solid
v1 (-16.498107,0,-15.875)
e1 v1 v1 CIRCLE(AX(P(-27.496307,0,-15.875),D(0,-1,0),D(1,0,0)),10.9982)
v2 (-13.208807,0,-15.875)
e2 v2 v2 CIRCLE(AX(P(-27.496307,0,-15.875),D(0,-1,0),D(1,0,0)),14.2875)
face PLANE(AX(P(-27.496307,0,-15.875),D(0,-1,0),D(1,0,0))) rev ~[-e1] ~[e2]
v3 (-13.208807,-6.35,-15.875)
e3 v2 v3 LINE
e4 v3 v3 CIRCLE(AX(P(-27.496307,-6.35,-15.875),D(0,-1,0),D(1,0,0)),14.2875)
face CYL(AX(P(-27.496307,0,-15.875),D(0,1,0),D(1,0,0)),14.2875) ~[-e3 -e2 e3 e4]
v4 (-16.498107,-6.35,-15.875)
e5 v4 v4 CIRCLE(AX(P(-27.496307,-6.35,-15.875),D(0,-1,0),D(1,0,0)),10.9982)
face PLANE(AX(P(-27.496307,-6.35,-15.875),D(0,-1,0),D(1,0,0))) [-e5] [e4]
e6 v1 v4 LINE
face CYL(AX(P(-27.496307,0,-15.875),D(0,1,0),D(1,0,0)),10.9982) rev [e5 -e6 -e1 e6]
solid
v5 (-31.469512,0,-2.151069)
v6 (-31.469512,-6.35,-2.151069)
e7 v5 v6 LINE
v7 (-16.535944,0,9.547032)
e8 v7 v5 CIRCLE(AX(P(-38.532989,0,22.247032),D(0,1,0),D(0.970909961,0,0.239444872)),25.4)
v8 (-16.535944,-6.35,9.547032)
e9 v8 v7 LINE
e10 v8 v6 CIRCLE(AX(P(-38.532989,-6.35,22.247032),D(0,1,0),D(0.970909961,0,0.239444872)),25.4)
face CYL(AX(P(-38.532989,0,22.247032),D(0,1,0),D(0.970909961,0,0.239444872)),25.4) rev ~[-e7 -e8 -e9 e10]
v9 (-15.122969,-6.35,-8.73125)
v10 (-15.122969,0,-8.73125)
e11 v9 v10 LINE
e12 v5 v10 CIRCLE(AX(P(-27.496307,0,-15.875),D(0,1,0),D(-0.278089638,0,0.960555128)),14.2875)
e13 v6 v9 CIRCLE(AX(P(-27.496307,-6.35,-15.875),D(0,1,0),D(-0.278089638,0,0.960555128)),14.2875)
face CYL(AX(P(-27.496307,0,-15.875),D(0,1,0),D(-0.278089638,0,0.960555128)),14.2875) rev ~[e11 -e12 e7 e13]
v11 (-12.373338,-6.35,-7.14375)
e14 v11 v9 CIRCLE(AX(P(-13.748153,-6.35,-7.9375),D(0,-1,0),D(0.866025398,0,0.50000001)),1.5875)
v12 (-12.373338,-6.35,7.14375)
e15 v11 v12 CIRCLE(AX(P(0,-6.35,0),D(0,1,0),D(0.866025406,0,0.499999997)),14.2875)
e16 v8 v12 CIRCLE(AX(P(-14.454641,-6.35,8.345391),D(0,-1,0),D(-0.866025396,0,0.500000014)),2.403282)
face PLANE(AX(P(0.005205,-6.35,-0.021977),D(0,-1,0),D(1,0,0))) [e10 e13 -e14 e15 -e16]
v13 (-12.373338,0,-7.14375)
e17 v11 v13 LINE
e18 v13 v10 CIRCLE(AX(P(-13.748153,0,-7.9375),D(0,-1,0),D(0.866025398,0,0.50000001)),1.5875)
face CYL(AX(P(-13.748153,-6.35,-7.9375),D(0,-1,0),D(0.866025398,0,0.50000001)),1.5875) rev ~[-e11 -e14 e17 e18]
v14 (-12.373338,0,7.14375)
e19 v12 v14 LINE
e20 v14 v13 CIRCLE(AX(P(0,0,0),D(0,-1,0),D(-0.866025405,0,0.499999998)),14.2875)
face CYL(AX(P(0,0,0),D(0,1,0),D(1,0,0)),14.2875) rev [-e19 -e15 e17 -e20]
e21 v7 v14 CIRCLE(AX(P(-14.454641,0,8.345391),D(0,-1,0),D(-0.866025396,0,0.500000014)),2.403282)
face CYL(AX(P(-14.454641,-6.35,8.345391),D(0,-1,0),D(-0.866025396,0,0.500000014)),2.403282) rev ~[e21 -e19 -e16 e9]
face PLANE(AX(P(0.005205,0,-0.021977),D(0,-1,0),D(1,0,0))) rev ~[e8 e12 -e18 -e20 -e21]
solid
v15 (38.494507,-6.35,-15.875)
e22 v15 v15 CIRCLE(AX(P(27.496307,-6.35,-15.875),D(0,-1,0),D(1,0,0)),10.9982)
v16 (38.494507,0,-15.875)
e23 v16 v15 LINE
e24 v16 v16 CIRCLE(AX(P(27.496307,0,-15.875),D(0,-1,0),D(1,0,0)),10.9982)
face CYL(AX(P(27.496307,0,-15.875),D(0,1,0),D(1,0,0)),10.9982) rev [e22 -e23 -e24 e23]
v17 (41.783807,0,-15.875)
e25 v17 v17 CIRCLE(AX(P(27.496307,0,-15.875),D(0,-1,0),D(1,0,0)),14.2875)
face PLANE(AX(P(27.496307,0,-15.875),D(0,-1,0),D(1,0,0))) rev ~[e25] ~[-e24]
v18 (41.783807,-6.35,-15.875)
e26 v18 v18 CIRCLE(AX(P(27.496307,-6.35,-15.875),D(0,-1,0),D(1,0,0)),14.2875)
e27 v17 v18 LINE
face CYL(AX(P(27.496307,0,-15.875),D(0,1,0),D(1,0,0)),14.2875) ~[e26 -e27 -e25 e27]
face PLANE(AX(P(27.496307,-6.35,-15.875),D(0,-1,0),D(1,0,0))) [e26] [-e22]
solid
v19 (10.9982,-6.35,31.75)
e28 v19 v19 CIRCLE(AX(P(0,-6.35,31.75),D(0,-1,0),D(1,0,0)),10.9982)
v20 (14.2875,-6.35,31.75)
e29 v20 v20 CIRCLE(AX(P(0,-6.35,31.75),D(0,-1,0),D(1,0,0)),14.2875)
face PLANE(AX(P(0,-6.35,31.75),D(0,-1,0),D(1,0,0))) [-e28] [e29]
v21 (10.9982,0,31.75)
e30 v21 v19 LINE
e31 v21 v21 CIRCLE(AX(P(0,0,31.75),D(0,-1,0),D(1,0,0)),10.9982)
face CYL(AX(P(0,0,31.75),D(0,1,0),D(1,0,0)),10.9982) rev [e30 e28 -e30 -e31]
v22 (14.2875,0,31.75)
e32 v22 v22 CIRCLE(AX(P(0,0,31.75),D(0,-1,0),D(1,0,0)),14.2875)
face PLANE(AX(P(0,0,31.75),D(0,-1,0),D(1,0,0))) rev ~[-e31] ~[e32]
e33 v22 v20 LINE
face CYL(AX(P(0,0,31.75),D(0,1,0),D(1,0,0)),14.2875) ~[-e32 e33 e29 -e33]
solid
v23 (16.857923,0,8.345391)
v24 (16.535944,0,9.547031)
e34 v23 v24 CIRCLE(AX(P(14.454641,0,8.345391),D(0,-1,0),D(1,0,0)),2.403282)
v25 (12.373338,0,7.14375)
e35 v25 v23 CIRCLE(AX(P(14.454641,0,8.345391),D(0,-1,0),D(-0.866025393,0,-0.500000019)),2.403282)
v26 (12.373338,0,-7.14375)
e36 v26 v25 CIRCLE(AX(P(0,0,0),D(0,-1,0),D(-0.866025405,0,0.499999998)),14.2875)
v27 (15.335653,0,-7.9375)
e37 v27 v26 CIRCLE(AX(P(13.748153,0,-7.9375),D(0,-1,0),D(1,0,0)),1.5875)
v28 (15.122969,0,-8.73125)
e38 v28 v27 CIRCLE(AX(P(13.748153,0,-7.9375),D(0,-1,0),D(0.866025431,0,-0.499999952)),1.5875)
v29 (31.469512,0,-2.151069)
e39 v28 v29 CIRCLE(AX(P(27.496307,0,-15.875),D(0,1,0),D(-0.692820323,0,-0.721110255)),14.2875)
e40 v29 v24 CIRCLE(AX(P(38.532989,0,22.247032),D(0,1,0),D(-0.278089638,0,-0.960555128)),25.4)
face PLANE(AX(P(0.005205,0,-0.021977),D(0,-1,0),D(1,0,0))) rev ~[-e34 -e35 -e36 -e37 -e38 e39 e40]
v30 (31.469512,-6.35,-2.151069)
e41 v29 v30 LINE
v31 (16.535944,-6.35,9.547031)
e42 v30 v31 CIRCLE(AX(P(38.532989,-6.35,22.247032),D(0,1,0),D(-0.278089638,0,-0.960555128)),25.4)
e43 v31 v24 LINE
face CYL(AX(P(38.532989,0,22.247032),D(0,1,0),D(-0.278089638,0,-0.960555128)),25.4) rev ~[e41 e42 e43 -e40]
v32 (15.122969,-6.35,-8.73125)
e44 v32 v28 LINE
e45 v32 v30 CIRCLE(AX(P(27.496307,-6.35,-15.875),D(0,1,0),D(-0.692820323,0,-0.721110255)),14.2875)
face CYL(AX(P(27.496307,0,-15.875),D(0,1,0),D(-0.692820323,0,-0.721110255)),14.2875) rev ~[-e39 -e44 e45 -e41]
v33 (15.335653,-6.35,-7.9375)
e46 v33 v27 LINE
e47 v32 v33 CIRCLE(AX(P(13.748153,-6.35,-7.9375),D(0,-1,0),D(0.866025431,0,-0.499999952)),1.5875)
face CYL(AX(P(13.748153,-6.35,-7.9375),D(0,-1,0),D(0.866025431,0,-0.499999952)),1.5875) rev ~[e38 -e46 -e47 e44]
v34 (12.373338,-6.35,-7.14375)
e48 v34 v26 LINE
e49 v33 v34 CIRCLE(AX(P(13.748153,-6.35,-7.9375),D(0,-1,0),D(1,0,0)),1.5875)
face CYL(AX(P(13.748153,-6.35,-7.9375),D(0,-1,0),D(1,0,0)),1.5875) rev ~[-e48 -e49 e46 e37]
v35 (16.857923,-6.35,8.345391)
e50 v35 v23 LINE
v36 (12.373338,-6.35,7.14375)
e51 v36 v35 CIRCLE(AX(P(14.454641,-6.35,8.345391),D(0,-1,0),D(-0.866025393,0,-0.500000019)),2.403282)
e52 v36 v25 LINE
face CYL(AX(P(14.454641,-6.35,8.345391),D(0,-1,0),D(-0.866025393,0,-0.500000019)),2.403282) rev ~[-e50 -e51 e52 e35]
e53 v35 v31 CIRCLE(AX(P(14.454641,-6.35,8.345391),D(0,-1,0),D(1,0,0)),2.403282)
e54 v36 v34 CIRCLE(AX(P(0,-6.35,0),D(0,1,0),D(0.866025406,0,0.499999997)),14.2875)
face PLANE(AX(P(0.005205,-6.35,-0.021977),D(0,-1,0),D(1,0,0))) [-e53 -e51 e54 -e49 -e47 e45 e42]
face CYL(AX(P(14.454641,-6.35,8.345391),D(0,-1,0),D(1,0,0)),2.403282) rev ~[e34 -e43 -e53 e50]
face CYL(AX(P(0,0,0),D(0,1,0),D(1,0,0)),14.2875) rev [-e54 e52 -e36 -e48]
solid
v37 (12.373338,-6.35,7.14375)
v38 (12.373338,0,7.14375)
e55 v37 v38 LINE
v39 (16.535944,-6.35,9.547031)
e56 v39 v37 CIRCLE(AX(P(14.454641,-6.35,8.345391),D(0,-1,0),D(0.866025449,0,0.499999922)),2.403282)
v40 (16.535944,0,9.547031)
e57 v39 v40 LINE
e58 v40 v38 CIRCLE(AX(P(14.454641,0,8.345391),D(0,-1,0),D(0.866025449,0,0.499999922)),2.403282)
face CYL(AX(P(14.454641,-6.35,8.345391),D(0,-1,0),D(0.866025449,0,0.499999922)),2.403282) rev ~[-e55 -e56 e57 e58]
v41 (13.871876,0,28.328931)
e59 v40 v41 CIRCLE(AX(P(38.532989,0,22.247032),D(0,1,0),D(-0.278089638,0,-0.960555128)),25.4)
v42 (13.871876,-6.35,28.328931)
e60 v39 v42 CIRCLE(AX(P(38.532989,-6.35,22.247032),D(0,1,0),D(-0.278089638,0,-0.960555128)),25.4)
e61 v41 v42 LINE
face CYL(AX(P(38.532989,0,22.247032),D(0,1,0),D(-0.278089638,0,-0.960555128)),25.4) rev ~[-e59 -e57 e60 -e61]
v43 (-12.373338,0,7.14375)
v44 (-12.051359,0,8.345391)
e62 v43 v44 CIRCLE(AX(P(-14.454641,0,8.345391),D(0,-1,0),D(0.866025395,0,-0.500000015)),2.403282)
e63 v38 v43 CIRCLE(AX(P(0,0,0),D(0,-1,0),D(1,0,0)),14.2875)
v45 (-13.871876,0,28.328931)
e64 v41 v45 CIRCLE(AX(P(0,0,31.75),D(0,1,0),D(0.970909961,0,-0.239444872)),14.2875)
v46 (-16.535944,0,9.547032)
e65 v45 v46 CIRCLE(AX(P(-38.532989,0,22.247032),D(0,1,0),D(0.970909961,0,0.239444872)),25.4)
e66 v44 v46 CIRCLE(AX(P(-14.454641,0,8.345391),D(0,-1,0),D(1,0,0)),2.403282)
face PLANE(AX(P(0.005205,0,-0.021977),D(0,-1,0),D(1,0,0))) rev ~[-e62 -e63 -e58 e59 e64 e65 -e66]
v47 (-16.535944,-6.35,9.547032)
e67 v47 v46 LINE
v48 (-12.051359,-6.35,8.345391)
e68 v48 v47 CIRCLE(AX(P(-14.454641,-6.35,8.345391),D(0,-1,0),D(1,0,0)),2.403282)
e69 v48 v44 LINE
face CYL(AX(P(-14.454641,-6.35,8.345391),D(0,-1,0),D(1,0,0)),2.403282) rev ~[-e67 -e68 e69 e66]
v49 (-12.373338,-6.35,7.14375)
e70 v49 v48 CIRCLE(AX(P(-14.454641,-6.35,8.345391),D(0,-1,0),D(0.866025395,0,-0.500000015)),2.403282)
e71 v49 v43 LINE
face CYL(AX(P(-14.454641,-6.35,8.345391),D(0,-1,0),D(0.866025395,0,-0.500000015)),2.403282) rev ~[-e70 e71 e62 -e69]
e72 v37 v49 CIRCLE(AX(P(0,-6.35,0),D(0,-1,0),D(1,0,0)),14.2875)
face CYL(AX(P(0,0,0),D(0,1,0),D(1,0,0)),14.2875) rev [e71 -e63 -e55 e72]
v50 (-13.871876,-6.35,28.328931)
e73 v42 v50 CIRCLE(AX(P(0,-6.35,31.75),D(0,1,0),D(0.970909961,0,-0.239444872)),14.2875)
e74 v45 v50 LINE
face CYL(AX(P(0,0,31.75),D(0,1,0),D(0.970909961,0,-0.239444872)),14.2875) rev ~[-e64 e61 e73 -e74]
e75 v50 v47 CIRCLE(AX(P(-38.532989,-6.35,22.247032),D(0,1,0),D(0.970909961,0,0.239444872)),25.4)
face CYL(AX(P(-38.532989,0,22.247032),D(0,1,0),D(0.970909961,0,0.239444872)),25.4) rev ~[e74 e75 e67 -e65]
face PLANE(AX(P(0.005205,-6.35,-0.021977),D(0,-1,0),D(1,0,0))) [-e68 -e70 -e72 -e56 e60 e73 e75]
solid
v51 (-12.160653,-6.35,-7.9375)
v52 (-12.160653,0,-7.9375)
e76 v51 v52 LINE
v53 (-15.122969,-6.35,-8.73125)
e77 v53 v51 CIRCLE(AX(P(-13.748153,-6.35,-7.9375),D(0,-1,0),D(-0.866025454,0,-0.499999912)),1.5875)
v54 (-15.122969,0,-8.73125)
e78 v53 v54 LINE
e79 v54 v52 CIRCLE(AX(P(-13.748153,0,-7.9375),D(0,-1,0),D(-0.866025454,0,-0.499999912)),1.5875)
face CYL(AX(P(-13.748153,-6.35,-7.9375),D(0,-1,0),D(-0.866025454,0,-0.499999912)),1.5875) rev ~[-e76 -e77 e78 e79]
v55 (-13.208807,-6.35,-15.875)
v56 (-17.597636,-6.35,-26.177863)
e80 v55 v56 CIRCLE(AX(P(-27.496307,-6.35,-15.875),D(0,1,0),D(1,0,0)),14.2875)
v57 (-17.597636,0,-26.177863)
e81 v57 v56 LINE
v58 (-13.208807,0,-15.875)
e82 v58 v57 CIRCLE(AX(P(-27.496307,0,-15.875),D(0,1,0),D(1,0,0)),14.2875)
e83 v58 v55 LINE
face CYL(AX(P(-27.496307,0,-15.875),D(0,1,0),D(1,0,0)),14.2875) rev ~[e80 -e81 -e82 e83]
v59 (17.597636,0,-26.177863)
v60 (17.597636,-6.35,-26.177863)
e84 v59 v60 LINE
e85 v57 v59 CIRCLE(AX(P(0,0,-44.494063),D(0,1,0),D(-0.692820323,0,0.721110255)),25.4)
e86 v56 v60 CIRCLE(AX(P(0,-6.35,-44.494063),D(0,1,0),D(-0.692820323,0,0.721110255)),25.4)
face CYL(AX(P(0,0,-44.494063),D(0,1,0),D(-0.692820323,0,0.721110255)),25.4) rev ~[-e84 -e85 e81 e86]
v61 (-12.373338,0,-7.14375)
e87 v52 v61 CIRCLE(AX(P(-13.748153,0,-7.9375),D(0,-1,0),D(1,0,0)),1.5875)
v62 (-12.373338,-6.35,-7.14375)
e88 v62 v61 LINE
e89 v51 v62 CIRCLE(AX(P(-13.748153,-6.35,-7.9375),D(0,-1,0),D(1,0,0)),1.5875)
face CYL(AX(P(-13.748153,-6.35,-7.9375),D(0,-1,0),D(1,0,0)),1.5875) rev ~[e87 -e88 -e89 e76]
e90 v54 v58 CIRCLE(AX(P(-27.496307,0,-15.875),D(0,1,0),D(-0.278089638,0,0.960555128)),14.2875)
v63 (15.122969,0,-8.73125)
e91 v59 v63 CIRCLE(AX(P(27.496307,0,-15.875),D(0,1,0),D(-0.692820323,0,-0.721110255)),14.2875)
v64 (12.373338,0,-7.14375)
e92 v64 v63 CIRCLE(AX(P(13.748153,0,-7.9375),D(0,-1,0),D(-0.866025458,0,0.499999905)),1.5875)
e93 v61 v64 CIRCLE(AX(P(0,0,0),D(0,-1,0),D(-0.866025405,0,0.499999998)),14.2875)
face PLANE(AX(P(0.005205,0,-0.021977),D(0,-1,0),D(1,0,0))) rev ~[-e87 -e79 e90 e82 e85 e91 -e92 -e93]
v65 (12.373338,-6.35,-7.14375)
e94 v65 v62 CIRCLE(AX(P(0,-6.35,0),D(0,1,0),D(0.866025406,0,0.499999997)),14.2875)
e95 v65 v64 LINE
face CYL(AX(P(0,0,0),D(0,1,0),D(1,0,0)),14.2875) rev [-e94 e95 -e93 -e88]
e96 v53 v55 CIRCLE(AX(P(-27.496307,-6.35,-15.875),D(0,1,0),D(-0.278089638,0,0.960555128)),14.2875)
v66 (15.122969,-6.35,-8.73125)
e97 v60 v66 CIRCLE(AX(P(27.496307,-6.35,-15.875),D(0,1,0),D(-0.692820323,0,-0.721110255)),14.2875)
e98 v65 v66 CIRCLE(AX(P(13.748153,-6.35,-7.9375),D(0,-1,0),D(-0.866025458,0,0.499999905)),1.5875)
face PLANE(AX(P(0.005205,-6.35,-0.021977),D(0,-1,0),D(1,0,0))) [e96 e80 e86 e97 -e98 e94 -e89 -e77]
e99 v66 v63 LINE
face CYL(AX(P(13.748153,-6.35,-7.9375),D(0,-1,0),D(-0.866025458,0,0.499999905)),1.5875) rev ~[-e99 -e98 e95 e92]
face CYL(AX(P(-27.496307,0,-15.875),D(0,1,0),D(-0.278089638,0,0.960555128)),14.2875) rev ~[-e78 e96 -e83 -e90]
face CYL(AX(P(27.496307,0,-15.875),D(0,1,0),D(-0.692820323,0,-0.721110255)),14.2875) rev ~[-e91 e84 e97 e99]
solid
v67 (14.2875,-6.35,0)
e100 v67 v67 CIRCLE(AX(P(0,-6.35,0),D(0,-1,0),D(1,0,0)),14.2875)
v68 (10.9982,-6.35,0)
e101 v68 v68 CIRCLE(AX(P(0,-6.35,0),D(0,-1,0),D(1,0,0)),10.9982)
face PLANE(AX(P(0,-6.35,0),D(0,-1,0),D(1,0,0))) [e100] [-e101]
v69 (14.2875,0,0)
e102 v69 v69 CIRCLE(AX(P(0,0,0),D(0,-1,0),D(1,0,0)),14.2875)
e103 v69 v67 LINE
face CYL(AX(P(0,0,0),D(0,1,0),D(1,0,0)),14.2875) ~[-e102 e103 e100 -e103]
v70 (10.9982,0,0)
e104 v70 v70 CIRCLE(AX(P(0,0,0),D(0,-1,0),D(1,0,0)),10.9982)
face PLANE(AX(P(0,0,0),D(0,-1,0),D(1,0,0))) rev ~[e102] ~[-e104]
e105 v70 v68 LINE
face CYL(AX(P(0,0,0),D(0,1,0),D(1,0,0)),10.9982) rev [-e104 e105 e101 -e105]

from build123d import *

# Parameters (mm, degrees)
F1_R     = 14.2875
F2_DEPTH = 6.35
F0_R     = 14.2875
F0_R_2   = 10.9982
F6_DEPTH = 25.4
F8_DEPTH = 25.4


with BuildPart() as f2:
    # F1 (on Front) → F2 (new body)
    with BuildSketch(Plane.XZ):
        with BuildLine():
            ThreePointArc((13.8718760728, 28.3289313848), (0, 17.4625), (-13.8718760728, 28.3289313848))
            ThreePointArc((-13.8718760728, 28.3289313848), (-16.5359438351, 9.5470316245), (-31.4695122777, -2.1510686152))
            ThreePointArc((-31.4695122777, -2.1510686152), (-18.912441482, -4.4535326513), (-13.2088065702, -15.875))
            ThreePointArc((-13.2088065702, -15.875), (-14.3517276668, -21.4743483284), (-17.5976362049, -26.1778627696))
            ThreePointArc((-17.5976362049, -26.1778627696), (0, -19.094063249), (17.5976362049, -26.1778627696))
            ThreePointArc((17.5976362049, -26.1778627696), (15.1229686136, -8.73125), (31.4695122777, -2.1510686152))
            ThreePointArc((31.4695122777, -2.1510686152), (16.5359438351, 9.5470316245), (13.8718760728, 28.3289313848))
        make_face()
        Circle(F1_R, mode=Mode.SUBTRACT)
    extrude(amount=F2_DEPTH)

    # F5 (on face) → F6 (cut)
    with BuildSketch(Plane.XZ.offset(6.35)):
        with BuildLine():
            ThreePointArc((12.3733379823, 7.1437499555), (15.0766559758, 6.02399903), (16.8579225203, 8.3453908122))
            ThreePointArc((16.8579225203, 8.3453908122), (16.7760327127, 8.9674057632), (16.535943943, 9.5470314377))
            ThreePointArc((16.535943943, 9.5470314377), (13.2530001547, 10.4266937926), (12.3733379823, 7.1437499555))
        make_face()
        with BuildLine():
            ThreePointArc((-16.5359438155, 9.5470316585), (-15.6562817429, 6.2640878931), (-12.3733379771, 7.1437499644))
            ThreePointArc((-12.3733379771, 7.1437499644), (-12.1332491122, 7.7233757372), (-12.0513592713, 8.3453908122))
            ThreePointArc((-12.0513592713, 8.3453908122), (-13.8326258217, 10.6667825961), (-16.5359438155, 9.5470316585))
        make_face()
    extrude(amount=-F6_DEPTH, mode=Mode.SUBTRACT)

    # F7 (on face) → F8 (cut)
    with BuildSketch(Plane.XZ.offset(6.35)):
        with BuildLine():
            ThreePointArc((15.1229686575, -8.731249924), (15.2815605457, -8.3483751917), (15.3356532851, -7.9375))
            ThreePointArc((15.3356532851, -7.9375), (14.1590284355, -6.4040927283), (12.3733378699, -7.1437501501))
            ThreePointArc((12.3733378699, -7.1437501501), (12.9544033981, -9.3123153938), (15.1229686575, -8.731249924))
        make_face()
        with BuildLine():
            ThreePointArc((-12.1606532851, -7.9375), (-12.2147460382, -7.5266247571), (-12.3733379657, -7.1437499842))
            ThreePointArc((-12.3733379657, -7.1437499842), (-14.5419032233, -6.5626846358), (-15.122968694, -8.7312498607))
            ThreePointArc((-15.122968694, -8.7312498607), (-13.3372781286, -9.47090727), (-12.1606532851, -7.9375))
        make_face()
    extrude(amount=-F8_DEPTH, mode=Mode.SUBTRACT)


with BuildPart() as f2b:
    # F0 (on Front) → F2, piece 2 (new body)
    with BuildSketch(Plane.XZ):
        with Locations((0, 31.75)):
            Circle(F0_R)
        with Locations((0, 31.75)):
            Circle(F0_R_2, mode=Mode.SUBTRACT)
    extrude(amount=F2_DEPTH)


with BuildPart() as f2c:
    # F0 (on Front) → F2, piece 3 (new body)
    with BuildSketch(Plane.XZ):
        with Locations((-27.4963065702, -15.875)):
            Circle(F0_R)
        with Locations((-27.4963065702, -15.875)):
            Circle(F0_R_2, mode=Mode.SUBTRACT)
    extrude(amount=F2_DEPTH)


with BuildPart() as f2d:
    # F0 (on Front) → F2, piece 4 (new body)
    with BuildSketch(Plane.XZ):
        with Locations((27.4963065702, -15.875)):
            Circle(F0_R)
        with Locations((27.4963065702, -15.875)):
            Circle(F0_R_2, mode=Mode.SUBTRACT)
    extrude(amount=F2_DEPTH)


with BuildPart() as f2e:
    # F0 (on Front) → F2, piece 5 (new body)
    with BuildSketch(Plane.XZ):
        Circle(F0_R)
        Circle(F0_R_2, mode=Mode.SUBTRACT)
    extrude(amount=F2_DEPTH)


solid = Compound([f2.part, f2b.part, f2c.part, f2d.part, f2e.part])
